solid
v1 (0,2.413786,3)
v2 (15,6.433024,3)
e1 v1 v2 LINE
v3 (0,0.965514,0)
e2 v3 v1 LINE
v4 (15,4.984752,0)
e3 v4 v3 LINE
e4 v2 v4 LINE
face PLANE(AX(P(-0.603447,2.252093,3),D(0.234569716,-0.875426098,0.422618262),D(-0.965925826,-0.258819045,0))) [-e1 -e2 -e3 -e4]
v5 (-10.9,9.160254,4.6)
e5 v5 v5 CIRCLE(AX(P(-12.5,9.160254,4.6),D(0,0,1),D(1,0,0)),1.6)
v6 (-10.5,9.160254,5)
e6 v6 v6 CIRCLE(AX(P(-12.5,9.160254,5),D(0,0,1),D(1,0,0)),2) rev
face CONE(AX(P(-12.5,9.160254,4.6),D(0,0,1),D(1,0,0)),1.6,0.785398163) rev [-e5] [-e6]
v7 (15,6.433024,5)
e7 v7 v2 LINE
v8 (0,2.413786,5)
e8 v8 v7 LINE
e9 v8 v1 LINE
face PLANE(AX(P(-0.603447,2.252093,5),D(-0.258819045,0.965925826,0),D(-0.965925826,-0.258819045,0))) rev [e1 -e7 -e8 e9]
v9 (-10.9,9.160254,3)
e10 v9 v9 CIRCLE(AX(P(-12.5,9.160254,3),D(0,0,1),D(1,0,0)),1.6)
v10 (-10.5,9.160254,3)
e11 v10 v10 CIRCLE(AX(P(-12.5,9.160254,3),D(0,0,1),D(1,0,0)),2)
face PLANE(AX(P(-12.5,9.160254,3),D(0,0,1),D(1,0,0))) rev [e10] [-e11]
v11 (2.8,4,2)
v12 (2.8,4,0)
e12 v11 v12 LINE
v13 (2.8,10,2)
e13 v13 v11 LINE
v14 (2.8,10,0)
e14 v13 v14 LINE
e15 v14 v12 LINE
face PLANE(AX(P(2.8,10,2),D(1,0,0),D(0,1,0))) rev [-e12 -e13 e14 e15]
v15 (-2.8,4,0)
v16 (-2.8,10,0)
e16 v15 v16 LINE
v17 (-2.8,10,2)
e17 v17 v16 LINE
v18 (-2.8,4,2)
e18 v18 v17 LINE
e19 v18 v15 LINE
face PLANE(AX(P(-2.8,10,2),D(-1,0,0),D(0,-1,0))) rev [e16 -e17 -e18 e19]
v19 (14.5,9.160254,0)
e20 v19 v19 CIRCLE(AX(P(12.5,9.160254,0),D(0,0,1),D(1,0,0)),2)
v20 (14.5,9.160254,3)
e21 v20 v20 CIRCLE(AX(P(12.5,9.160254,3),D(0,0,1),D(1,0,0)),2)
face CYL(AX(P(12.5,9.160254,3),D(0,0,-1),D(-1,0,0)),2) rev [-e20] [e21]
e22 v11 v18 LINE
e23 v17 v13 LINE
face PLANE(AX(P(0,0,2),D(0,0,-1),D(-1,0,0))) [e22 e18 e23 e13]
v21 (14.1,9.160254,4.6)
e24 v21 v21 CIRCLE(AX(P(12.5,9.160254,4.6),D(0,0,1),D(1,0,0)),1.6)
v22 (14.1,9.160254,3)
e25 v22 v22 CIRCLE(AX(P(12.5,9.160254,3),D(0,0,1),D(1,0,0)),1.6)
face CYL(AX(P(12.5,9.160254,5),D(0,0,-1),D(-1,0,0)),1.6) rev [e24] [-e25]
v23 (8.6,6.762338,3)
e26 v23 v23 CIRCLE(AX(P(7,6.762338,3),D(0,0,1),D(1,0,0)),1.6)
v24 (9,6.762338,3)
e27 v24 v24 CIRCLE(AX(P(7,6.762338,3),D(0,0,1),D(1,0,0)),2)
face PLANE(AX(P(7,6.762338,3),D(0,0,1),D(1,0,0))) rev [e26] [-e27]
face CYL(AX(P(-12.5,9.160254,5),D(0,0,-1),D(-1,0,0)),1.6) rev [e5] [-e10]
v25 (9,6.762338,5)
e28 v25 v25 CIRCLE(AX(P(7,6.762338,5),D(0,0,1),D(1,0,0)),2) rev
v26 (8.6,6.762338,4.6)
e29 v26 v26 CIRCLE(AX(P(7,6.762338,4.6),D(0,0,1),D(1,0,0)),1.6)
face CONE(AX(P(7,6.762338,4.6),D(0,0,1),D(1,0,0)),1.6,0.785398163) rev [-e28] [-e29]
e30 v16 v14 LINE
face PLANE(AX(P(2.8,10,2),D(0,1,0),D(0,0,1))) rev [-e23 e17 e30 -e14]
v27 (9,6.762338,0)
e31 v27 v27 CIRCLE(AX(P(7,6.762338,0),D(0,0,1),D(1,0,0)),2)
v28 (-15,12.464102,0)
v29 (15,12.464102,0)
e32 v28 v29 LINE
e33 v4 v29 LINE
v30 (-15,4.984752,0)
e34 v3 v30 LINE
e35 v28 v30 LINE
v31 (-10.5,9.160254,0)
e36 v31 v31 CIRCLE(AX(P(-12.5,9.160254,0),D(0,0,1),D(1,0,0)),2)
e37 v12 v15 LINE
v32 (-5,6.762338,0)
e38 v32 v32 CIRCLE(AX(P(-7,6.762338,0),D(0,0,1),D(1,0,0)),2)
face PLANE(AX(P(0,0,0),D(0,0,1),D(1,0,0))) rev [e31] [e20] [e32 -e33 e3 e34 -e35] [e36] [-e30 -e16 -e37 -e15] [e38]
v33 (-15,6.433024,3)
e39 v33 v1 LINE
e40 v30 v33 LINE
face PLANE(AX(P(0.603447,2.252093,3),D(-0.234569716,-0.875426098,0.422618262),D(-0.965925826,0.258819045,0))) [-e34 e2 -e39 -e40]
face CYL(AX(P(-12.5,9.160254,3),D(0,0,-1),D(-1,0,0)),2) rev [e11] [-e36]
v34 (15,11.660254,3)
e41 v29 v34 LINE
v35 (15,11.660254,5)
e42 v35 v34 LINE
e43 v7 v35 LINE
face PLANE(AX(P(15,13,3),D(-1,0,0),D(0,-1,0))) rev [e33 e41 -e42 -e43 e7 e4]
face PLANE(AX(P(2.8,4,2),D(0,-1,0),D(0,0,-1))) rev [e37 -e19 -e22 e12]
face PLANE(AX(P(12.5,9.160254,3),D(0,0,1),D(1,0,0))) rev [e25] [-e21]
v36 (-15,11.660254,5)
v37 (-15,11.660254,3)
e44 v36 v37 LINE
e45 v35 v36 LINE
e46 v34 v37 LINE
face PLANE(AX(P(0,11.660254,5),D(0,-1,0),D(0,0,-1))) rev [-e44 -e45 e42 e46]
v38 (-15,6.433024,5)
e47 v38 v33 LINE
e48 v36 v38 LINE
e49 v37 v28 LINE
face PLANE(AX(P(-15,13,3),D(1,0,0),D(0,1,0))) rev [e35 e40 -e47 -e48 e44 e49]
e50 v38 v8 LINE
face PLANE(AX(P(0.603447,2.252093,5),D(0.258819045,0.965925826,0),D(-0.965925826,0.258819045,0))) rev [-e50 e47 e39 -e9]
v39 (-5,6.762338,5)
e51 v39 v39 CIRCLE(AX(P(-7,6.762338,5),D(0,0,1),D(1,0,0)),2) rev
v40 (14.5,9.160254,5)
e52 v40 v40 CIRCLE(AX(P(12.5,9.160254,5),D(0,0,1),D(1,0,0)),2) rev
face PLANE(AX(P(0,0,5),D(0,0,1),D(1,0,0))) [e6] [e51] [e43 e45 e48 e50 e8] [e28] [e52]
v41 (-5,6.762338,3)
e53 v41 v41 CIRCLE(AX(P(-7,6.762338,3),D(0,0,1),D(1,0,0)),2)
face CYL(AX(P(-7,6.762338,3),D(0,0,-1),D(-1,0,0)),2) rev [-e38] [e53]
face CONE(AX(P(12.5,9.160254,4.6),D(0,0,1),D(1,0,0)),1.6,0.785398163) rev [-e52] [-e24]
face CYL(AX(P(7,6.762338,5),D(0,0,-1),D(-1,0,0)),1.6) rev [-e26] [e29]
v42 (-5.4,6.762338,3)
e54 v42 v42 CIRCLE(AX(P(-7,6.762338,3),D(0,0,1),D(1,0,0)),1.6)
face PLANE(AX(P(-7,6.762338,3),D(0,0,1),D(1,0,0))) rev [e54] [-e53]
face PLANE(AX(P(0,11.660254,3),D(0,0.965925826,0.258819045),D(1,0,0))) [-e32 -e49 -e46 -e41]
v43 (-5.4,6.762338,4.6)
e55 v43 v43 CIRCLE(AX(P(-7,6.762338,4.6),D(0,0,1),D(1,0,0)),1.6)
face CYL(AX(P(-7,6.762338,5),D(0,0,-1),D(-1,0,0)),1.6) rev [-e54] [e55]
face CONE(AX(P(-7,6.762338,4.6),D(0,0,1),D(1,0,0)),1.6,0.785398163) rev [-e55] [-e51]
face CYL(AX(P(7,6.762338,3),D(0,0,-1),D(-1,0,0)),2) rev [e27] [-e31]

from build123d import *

# Parameters (mm, degrees)
RESSALTO_EXTRUS_O1_DEPTH   = 3
CHANFRO1_SIZE              = 5
CHANFRO1_SIZE_2            = 2.331538291
CHANFRO2_SIZE              = 1.339745962
CHANFRO2_SIZE_2            = 5
RESSALTO_EXTRUS_O2_DEPTH   = 2
CORTE_EXTRUS_O1_DEPTH      = 21.133400832
CORTE_EXTRUS_O1_DEPTH_BACK = 21.133400832
ESBO_O3_R                  = 1.6
ESBO_O4_R                  = 2
CORTE_EXTRUS_O2_DEPTH      = 3
ESBO_O6_W                  = 5.6
ESBO_O6_H                  = 6
CORTE_EXTRUS_O3_DEPTH      = 2
CHANFRO3_SIZE              = 0.4


with BuildPart() as part:
    # Esboço1 → Ressalto-extrusão1 (new body)
    with BuildSketch(Plane.XY):
        Polygon((-15, 13), (-15, 4.019237886), (0, 0), (15, 4.019237886), (15, 13), align=None)
    extrude(amount=RESSALTO_EXTRUS_O1_DEPTH)

    # Chanfro1
    # the kernel refuses this chamfer: 5, 2.331538291 mm, written as the material it takes off along each edge
    with BuildSketch(Plane(origin=(-27.513450616, 7.372206873, 3), x_dir=(-0.00422163992492442, -0.015755374691079384, -0.9998669641130704), z_dir=(0.9659258262890691, -0.25881904510251785, 0)), Plane(origin=(-12.513450616, -3.352968987, 3), x_dir=(0.004221639924924417, -0.015755374691079373, -0.9998669641130704), z_dir=(0.9659258262890691, 0.25881904510251785, 0))) as chanfro1_piece_1:
        Polygon((CHANFRO1_SIZE * 0.999866964113, CHANFRO1_SIZE * 0.0163111641311), (-CHANFRO1_SIZE_2 * 0.0163111641295, CHANFRO1_SIZE_2 * 0.999866964017), (0, 0), align=None)
    extrude(amount=41.43889742, mode=Mode.SUBTRACT)

    # Chanfro2
    # the kernel refuses this chamfer: 5, 1.339745962 mm, written as the material it takes off along each edge
    with BuildSketch(Plane(origin=(27.983607851, 13, 3), x_dir=(0, -0.9905000388259543, 0.13751244702128929), z_dir=(-1, 0, 0))) as chanfro2_piece_1:
        Polygon((CHANFRO2_SIZE * 0.990500038941, -CHANFRO2_SIZE * 0.137512447037), (-CHANFRO2_SIZE_2 * 0.137512447021, -CHANFRO2_SIZE_2 * 0.990500038826), (0, 0), align=None)
    extrude(amount=55.967215702, mode=Mode.SUBTRACT)

    # Esboço2 → Ressalto-extrusão2 (add)
    with BuildSketch(Plane.XY.offset(3)):
        Polygon((0, 2.413786056), (15, 6.433023943), (15, 11.660254038), (-15, 11.660254038), (-15, 6.433023943), align=None)
    extrude(amount=RESSALTO_EXTRUS_O2_DEPTH)

    # Esboço3 → Corte-extrusão1 (cut, two sides: drawn at the far end of the back side and taken through both)
    with BuildSketch(Plane.XY.offset(-CORTE_EXTRUS_O1_DEPTH_BACK)):
        with Locations((-7, 6.762338276)):
            Circle(ESBO_O3_R)
        with Locations(Location((7, 6.762338276, 0), (0, 0, 180))):
            Circle(ESBO_O3_R)
        with Locations((-12.5, 9.160254038)):
            Circle(ESBO_O3_R)
        with Locations(Location((12.5, 9.160254038, 0), (0, 0, 180))):
            Circle(ESBO_O3_R)
    extrude(amount=CORTE_EXTRUS_O1_DEPTH + CORTE_EXTRUS_O1_DEPTH_BACK, mode=Mode.SUBTRACT)

    # Esboço4 → Corte-extrusão2 (cut)
    with BuildSketch(Plane(origin=(0, 0, 0), x_dir=(-1, 0, 0), z_dir=(0, 0, -1))):
        with Locations(Location((-7, 6.762338276, 0), (0, 0, 180))):
            Circle(ESBO_O4_R)
        with Locations(Location((12.5, 9.160254038, 0), (0, 0, 180))):
            Circle(ESBO_O4_R)
        with Locations(Location((-12.5, 9.160254038, 0), (0, 0, 180))):
            Circle(ESBO_O4_R)
        with Locations(Location((7, 6.762338276, 0), (0, 0, 180))):
            Circle(ESBO_O4_R)
    extrude(amount=-CORTE_EXTRUS_O2_DEPTH, mode=Mode.SUBTRACT)

    # Esboço6 → Corte-extrusão3 (cut)
    with BuildSketch(Plane(origin=(0, 0, 0), x_dir=(-1, 0, 0), z_dir=(0, 0, -1))):
        with Locations((0, 7)):
            Rectangle(ESBO_O6_W, ESBO_O6_H)
    extrude(amount=-CORTE_EXTRUS_O3_DEPTH, mode=Mode.SUBTRACT)

    # Chanfro3
    chanfro3_edges = [part.edges().sort_by_distance(p)[0] for p in [
        (14.1, 9.160254038, 5),
        (-14.1, 9.160254038, 5),
        (8.6, 6.762338276, 5),
        (-8.6, 6.762338276, 5),
    ]]
    chamfer(chanfro3_edges, length=CHANFRO3_SIZE)


solid = part.part
